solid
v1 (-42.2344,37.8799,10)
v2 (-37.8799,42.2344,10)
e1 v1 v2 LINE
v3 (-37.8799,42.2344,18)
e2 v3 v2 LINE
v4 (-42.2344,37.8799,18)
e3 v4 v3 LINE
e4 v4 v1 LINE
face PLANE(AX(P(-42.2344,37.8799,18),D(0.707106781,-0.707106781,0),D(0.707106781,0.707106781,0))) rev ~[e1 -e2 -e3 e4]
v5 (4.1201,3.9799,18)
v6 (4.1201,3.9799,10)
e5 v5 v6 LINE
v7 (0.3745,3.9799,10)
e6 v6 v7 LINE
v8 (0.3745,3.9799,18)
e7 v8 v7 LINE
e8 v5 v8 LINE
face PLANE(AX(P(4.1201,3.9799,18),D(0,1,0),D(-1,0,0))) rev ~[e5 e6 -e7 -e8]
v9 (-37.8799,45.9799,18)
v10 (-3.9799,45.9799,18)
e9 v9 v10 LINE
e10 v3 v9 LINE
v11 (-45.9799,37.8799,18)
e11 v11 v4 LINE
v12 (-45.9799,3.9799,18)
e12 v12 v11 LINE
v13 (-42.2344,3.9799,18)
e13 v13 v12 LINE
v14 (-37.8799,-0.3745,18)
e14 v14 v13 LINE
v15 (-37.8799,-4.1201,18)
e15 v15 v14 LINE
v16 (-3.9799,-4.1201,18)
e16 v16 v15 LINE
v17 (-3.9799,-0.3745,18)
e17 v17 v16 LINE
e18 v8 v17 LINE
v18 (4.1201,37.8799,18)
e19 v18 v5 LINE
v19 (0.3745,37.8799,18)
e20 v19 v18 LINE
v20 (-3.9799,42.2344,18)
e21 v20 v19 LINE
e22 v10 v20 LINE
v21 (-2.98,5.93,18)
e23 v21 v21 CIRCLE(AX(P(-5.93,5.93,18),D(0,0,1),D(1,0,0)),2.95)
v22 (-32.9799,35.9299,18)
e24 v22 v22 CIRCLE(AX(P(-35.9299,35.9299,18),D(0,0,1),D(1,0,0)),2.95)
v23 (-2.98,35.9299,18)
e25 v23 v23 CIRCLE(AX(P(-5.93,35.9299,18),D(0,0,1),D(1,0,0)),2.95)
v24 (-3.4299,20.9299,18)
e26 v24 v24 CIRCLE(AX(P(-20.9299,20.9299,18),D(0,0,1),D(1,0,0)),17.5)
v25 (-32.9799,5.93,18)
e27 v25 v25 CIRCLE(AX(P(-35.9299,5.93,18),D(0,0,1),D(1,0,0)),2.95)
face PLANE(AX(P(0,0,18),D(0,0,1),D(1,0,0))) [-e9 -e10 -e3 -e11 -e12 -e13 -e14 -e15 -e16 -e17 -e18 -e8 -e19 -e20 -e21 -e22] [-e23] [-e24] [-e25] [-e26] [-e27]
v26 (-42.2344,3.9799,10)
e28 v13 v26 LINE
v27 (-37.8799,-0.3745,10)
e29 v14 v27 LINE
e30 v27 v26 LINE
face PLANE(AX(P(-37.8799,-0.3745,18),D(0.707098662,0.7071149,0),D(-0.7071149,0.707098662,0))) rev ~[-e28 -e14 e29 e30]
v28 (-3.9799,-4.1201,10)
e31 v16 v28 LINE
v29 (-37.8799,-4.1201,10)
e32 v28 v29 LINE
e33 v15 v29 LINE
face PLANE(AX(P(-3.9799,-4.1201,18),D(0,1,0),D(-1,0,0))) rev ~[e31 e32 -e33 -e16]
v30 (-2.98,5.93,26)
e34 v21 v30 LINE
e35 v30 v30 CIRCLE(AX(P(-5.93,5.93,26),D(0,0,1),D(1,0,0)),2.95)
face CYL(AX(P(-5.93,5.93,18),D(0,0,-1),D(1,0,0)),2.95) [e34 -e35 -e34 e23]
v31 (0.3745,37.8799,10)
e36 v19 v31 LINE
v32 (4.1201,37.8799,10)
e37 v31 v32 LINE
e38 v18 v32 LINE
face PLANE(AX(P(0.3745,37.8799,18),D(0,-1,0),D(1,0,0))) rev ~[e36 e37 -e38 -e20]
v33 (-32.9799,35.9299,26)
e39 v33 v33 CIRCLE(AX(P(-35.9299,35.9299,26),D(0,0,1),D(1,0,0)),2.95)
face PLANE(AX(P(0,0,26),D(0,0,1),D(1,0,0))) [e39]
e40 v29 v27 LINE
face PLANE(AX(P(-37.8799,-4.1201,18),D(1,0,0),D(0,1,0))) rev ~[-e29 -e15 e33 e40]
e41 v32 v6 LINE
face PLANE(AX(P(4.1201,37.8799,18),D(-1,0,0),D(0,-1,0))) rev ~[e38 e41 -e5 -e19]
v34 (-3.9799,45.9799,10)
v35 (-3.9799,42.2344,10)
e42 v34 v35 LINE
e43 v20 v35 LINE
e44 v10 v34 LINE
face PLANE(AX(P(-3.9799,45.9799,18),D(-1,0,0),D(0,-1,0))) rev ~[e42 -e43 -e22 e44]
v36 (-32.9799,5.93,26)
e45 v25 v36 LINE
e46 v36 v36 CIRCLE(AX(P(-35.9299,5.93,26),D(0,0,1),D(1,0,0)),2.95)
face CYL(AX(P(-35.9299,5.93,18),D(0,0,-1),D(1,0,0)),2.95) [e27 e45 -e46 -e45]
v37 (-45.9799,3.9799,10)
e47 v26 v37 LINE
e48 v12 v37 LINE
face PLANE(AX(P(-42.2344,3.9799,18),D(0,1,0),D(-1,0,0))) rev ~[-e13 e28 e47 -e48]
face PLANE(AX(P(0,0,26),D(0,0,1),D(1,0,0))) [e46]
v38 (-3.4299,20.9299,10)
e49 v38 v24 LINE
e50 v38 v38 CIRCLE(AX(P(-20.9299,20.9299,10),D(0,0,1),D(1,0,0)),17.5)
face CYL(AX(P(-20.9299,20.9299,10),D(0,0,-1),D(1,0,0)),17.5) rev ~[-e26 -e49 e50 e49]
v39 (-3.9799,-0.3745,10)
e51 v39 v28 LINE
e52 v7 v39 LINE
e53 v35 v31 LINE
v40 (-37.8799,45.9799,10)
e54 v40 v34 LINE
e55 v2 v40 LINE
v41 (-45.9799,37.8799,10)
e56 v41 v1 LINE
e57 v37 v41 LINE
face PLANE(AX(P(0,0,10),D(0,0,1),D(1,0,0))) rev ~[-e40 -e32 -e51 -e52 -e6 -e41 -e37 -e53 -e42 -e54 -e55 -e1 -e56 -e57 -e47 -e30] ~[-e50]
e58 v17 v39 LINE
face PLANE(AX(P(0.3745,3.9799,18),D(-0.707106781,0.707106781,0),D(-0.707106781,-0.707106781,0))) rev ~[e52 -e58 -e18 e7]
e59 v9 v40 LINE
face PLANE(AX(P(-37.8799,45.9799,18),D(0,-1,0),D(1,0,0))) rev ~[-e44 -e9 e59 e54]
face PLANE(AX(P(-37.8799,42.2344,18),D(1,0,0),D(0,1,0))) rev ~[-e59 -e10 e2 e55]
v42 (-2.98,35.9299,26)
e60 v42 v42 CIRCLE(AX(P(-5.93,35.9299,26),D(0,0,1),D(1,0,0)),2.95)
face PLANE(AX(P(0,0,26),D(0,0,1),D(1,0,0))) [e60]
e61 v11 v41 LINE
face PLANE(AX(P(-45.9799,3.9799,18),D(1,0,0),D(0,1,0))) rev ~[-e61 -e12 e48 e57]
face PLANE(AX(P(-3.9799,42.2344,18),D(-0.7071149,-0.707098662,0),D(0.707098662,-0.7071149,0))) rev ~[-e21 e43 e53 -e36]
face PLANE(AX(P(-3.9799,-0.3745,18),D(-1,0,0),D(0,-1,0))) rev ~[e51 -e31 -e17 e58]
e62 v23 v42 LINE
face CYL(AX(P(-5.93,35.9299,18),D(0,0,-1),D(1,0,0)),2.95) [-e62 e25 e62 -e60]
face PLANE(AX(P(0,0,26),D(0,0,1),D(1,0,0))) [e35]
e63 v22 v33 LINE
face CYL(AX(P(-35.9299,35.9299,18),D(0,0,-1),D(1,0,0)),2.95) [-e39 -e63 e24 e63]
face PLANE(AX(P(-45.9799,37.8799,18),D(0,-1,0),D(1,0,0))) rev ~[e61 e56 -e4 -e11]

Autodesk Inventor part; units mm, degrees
ref_plane "YZ Plane" through (0, 0, 0) normal (1, 0, 0) x (0, 1, 0)
ref_plane "XZ Plane" through (0, 0, 0) normal (0, 1, 0) x (-1, 0, 0)
ref_plane "Work Plane1" through (0, 0, 10) normal (0, 0, 1) x (1, 0, 0)
sketch "Sketch1" plane through (0, 0, 10) normal (0, 0, 1) x (1, 0, 0)
  line L0 (-4.0299, -0.3538) -> (-2.2322, 1.4439) construction
  arc A0 (-1.4439, 2.2322) -> (-2.2322, 1.4439) centre (-0.9299, 0.9299) ccw construction
  line L1 (-1.4439, 2.2322) -> (0.3538, 4.0299) construction
  line L2 (-37.8299, 42.8299) -> (-37.8299, 37.8299) construction
  line L3 (-37.8299, 37.8299) -> (-42.9208, 37.8299) construction
  line L4 (-37.8299, 42.2137) -> (-37.8299, 45.8299) construction
  line L5 (-37.8299, 45.8299) -> (-4.0299, 45.8299) construction
  line L6 (-4.0299, 45.8299) -> (-4.0299, 42.2137) construction
  line L7 (-4.0299, 4.0299) -> (0.3538, 4.0299) projected
  circle A1 centre (-20.9299, 20.9299) radius 17.5 projected
  line L8 (-20.9299, 58.9723) -> (17.1124, 20.9299) construction
  line L9 (17.1124, 20.9299) -> (-20.9299, -17.1124) construction
  line L10 (-20.9299, -17.1124) -> (-58.9723, 20.9299) construction
  line L11 (-58.9723, 20.9299) -> (-20.9299, 58.9723) construction
  line L12 (-20.9299, 58.9723) -> (-20.9299, -17.1124) construction
  line L13 (17.1124, 20.9299) -> (-58.9723, 20.9299) construction
  line L14 (-20.9299, 58.9723) -> (32.8701, 58.9723) construction
  line L15 (-43.4299, 43.4299) -> (1.5701, 43.4299) construction
  line L16 (1.5701, 43.4299) -> (1.5701, -1.5701) construction
  line L17 (1.5701, -1.5701) -> (-43.4299, -1.5701) construction
  line L18 (-43.4299, -1.5701) -> (-43.4299, 43.4299) construction
  line L19 (-43.4299, 43.4299) -> (1.5701, -1.5701) construction
  line L20 (1.5701, 43.4299) -> (-43.4299, -1.5701) construction
  line L21 (-43.4299, 5.3876) -> (-43.4299, 36.4723)
  line L22 (-43.4299, 36.4723) -> (-36.4723, 43.4299)
  line L23 (-36.4723, 43.4299) -> (-5.3876, 43.4299)
  line L24 (-5.3876, 43.4299) -> (1.5701, 36.4723)
  line L25 (1.5701, 36.4723) -> (1.5701, 5.3876)
  line L26 (1.5701, 5.3876) -> (-5.3876, -1.5701)
  line L27 (-5.3876, -1.5701) -> (-36.4723, -1.5701)
  line L28 (-36.4723, -1.5701) -> (-43.4299, 5.3876)
  line L29 (-4.0299, 42.2137) -> (-37.8299, 42.2137) projected
  line L30 (-4.0299, -0.3538) -> (-4.0299, 4.0299) projected
  point P0 (-37.8299, 4.0299)
  point P1 (-20.9299, 20.9299)
  dimension "d18" = 53.8
  dimension "d19" = 45
  dimension "d20" = 53.8
  dimension "d21" = 45
  dimension "d22" = 45
extrude "Extrusion1" add sketch "Sketch1" along normal blind 8
sketch "Sketch2" plane through (0, 0, 18) normal (0, 0, 1) x (1, 0, 0)
  circle A0 centre (-35.9299, 35.9299) radius 3.0099 construction
  circle A1 centre (-5.93, 35.9299) radius 3.0099 construction
  circle A2 centre (-5.93, 5.93) radius 3.0099 construction
  circle A3 centre (-35.9299, 5.93) radius 3.0099 construction
  circle A4 centre (-35.9299, 35.9299) radius 2.95
  circle A5 centre (-5.93, 35.9299) radius 2.95
  circle A6 centre (-5.93, 5.93) radius 2.95
  circle A7 centre (-35.9299, 5.93) radius 2.95
  point P0 (0, 0)
  dimension "d1" = 5.9
  dimension "d31" = 5.9
  dimension "d32" = 5.9
  dimension "d33" = 5.9
ref_plane "Work Plane2" through (-40.9959, 0.8639, 22.2359) normal (0, 0, 1) x (1, 0, 0)
extrude "Extrusion2" add sketch "Sketch2" along normal blind 8
sketch "Sketch3" plane through (0, 0, 10) normal (0, 0, -1) x (-1, 0, 0)
  line L0 (37.8299, -0.4701) -> (37.8299, 4.0299) construction
  line L1 (4.0299, 4.0299) -> (4.0299, -0.4701) construction
  line L2 (37.8299, -0.4701) -> (37.8299, 1.1886) construction
  line L3 (4.0299, -3.9701) -> (4.0299, -0.3538) construction
  line L4 (45.8299, 4.0299) -> (42.2137, 4.0299) construction
  line L5 (-0.3538, 4.0299) -> (-3.9701, 4.0299) construction
  line L6 (-3.9701, 37.8299) -> (-0.3538, 37.8299) construction
  line L7 (4.0299, 42.2137) -> (4.0299, 45.8299) construction
  line L8 (37.8299, 45.8299) -> (37.8299, 42.2137) construction
  line L9 (42.2137, 37.8299) -> (45.8299, 37.8299) construction
  line L10 (40.4657, 37.7299) -> (45.8299, 37.7299)
  line L11 (45.8299, 37.7299) -> (45.8299, 4.1299)
  line L12 (45.8299, 4.1299) -> (40.4657, 4.1299)
  line L13 (40.4657, 4.1299) -> (40.4657, 37.7299)
  line L14 (37.7299, 2.4952) -> (4.1299, 2.4952)
  line L15 (4.1299, 2.4952) -> (4.1299, -3.9701)
  line L16 (4.1299, -3.9701) -> (37.7299, -3.9701)
  line L17 (37.7299, -3.9701) -> (37.7299, 2.4952)
  line L18 (1.8946, 4.1299) -> (-3.9701, 4.1299)
  line L19 (-3.9701, 4.1299) -> (-3.9701, 37.7299)
  line L20 (-3.9701, 37.7299) -> (1.8946, 37.7299)
  line L21 (1.8946, 37.7299) -> (1.8946, 4.1299)
  line L22 (4.1299, 40.7326) -> (37.7299, 40.7326)
  line L23 (37.7299, 40.7326) -> (37.7299, 45.8299)
  line L24 (37.7299, 45.8299) -> (4.1299, 45.8299)
  line L25 (4.1299, 45.8299) -> (4.1299, 40.7326)
  point P0 (0, 0)
  dimension "d23" = 0.1
  dimension "d24" = 0.1
  dimension "d25" = 0.1
  dimension "d26" = 0.1
  dimension "d27" = 0.1
extrude "Extrusion3" add sketch "Sketch3" against normal up to surface (8 mm away)
sketch "Sketch4" plane through (0, 0, 18) normal (0, 0, 1) x (1, 0, 0)
  line L0 (3.9701, 4.1299) -> (0.3124, 4.1299) projected
  line L1 (3.9701, 37.7299) -> (3.9701, 4.1299) projected
  line L2 (0.3124, 37.7299) -> (3.9701, 37.7299) projected
  line L3 (0.3124, 37.7299) -> (-4.1299, 42.1723) projected
  line L4 (-4.1299, 45.8299) -> (-4.1299, 42.1723) projected
  line L5 (-37.7299, 45.8299) -> (-4.1299, 45.8299) projected
  line L6 (-37.7299, 42.1723) -> (-37.7299, 45.8299) projected
  line L7 (-37.7299, 42.1723) -> (-42.1723, 37.7299) projected
  line L8 (-45.8299, 37.7299) -> (-42.1723, 37.7299) projected
  line L9 (-45.8299, 4.1299) -> (-45.8299, 37.7299) projected
  line L10 (-42.1723, 4.1299) -> (-45.8299, 4.1299) projected
  line L11 (-42.1723, 4.1299) -> (-37.7299, -0.3124) projected
  line L12 (-37.7299, -3.9701) -> (-37.7299, -0.3124) projected
  line L13 (-4.1299, -3.9701) -> (-37.7299, -3.9701) projected
  line L14 (-4.1299, -0.3124) -> (-4.1299, -3.9701) projected
  line L15 (-4.1299, -0.3124) -> (0.3124, 4.1299) projected
  circle A0 centre (-20.9299, 20.9299) radius 17.5 projected
  circle A1 centre (-35.9299, 5.93) radius 2.95 projected
  circle A2 centre (-5.93, 35.9299) radius 2.95 projected
  circle A3 centre (-35.9299, 35.9299) radius 2.95 projected
  circle A4 centre (-5.93, 5.93) radius 2.95 projected
  line L16 (-3.9799, 45.9799) -> (-3.9799, 42.2344)
  line L17 (-3.9799, 42.2344) -> (0.3745, 37.8799)
  line L18 (0.3745, 37.8799) -> (4.1201, 37.8799)
  line L19 (4.1201, 37.8799) -> (4.1201, 3.9799)
  line L20 (4.1201, 3.9799) -> (0.3745, 3.9799)
  line L21 (0.3745, 3.9799) -> (-3.9799, -0.3745)
  line L22 (-3.9799, -0.3745) -> (-3.9799, -4.1201)
  line L23 (-3.9799, -4.1201) -> (-37.8799, -4.1201)
  line L24 (-37.8799, -4.1201) -> (-37.8799, -0.3745)
  line L25 (-37.8799, -0.3745) -> (-42.2344, 3.9799)
  line L26 (-42.2344, 3.9799) -> (-45.9799, 3.9799)
  line L27 (-45.9799, 3.9799) -> (-45.9799, 37.8799)
  line L28 (-45.9799, 37.8799) -> (-42.2344, 37.8799)
  line L29 (-42.2344, 37.8799) -> (-37.8799, 42.2344)
  line L30 (-37.8799, 42.2344) -> (-37.8799, 45.9799)
  line L31 (-37.8799, 45.9799) -> (-3.9799, 45.9799)
  point P0 (0, 0)
  dimension "d34" = 0.15
extrude "Extrusion4" add sketch "Sketch4" against normal up to surface (8 mm away) contours L16 L17 L18 L19 L20 L21 L22 L23 L24 L25 L26 L27 L28 L29 L30 L31
ref_plane "Arbeitsebene3" through (-37.8799, 20.9299, 18) normal (0, -1, 0) x (1, 0, 0)
ref_plane "Arbeitsebene4" through (-20.9299, 3.9799, 18) normal (1, 0, 0) x (0, 0, -1)
equation "\"d31\" = d1"
equation "\"d32\" = d1"
equation "\"d33\" = d1"
properties part number "20_Cube_Insert_Thorlabs_Pins"
